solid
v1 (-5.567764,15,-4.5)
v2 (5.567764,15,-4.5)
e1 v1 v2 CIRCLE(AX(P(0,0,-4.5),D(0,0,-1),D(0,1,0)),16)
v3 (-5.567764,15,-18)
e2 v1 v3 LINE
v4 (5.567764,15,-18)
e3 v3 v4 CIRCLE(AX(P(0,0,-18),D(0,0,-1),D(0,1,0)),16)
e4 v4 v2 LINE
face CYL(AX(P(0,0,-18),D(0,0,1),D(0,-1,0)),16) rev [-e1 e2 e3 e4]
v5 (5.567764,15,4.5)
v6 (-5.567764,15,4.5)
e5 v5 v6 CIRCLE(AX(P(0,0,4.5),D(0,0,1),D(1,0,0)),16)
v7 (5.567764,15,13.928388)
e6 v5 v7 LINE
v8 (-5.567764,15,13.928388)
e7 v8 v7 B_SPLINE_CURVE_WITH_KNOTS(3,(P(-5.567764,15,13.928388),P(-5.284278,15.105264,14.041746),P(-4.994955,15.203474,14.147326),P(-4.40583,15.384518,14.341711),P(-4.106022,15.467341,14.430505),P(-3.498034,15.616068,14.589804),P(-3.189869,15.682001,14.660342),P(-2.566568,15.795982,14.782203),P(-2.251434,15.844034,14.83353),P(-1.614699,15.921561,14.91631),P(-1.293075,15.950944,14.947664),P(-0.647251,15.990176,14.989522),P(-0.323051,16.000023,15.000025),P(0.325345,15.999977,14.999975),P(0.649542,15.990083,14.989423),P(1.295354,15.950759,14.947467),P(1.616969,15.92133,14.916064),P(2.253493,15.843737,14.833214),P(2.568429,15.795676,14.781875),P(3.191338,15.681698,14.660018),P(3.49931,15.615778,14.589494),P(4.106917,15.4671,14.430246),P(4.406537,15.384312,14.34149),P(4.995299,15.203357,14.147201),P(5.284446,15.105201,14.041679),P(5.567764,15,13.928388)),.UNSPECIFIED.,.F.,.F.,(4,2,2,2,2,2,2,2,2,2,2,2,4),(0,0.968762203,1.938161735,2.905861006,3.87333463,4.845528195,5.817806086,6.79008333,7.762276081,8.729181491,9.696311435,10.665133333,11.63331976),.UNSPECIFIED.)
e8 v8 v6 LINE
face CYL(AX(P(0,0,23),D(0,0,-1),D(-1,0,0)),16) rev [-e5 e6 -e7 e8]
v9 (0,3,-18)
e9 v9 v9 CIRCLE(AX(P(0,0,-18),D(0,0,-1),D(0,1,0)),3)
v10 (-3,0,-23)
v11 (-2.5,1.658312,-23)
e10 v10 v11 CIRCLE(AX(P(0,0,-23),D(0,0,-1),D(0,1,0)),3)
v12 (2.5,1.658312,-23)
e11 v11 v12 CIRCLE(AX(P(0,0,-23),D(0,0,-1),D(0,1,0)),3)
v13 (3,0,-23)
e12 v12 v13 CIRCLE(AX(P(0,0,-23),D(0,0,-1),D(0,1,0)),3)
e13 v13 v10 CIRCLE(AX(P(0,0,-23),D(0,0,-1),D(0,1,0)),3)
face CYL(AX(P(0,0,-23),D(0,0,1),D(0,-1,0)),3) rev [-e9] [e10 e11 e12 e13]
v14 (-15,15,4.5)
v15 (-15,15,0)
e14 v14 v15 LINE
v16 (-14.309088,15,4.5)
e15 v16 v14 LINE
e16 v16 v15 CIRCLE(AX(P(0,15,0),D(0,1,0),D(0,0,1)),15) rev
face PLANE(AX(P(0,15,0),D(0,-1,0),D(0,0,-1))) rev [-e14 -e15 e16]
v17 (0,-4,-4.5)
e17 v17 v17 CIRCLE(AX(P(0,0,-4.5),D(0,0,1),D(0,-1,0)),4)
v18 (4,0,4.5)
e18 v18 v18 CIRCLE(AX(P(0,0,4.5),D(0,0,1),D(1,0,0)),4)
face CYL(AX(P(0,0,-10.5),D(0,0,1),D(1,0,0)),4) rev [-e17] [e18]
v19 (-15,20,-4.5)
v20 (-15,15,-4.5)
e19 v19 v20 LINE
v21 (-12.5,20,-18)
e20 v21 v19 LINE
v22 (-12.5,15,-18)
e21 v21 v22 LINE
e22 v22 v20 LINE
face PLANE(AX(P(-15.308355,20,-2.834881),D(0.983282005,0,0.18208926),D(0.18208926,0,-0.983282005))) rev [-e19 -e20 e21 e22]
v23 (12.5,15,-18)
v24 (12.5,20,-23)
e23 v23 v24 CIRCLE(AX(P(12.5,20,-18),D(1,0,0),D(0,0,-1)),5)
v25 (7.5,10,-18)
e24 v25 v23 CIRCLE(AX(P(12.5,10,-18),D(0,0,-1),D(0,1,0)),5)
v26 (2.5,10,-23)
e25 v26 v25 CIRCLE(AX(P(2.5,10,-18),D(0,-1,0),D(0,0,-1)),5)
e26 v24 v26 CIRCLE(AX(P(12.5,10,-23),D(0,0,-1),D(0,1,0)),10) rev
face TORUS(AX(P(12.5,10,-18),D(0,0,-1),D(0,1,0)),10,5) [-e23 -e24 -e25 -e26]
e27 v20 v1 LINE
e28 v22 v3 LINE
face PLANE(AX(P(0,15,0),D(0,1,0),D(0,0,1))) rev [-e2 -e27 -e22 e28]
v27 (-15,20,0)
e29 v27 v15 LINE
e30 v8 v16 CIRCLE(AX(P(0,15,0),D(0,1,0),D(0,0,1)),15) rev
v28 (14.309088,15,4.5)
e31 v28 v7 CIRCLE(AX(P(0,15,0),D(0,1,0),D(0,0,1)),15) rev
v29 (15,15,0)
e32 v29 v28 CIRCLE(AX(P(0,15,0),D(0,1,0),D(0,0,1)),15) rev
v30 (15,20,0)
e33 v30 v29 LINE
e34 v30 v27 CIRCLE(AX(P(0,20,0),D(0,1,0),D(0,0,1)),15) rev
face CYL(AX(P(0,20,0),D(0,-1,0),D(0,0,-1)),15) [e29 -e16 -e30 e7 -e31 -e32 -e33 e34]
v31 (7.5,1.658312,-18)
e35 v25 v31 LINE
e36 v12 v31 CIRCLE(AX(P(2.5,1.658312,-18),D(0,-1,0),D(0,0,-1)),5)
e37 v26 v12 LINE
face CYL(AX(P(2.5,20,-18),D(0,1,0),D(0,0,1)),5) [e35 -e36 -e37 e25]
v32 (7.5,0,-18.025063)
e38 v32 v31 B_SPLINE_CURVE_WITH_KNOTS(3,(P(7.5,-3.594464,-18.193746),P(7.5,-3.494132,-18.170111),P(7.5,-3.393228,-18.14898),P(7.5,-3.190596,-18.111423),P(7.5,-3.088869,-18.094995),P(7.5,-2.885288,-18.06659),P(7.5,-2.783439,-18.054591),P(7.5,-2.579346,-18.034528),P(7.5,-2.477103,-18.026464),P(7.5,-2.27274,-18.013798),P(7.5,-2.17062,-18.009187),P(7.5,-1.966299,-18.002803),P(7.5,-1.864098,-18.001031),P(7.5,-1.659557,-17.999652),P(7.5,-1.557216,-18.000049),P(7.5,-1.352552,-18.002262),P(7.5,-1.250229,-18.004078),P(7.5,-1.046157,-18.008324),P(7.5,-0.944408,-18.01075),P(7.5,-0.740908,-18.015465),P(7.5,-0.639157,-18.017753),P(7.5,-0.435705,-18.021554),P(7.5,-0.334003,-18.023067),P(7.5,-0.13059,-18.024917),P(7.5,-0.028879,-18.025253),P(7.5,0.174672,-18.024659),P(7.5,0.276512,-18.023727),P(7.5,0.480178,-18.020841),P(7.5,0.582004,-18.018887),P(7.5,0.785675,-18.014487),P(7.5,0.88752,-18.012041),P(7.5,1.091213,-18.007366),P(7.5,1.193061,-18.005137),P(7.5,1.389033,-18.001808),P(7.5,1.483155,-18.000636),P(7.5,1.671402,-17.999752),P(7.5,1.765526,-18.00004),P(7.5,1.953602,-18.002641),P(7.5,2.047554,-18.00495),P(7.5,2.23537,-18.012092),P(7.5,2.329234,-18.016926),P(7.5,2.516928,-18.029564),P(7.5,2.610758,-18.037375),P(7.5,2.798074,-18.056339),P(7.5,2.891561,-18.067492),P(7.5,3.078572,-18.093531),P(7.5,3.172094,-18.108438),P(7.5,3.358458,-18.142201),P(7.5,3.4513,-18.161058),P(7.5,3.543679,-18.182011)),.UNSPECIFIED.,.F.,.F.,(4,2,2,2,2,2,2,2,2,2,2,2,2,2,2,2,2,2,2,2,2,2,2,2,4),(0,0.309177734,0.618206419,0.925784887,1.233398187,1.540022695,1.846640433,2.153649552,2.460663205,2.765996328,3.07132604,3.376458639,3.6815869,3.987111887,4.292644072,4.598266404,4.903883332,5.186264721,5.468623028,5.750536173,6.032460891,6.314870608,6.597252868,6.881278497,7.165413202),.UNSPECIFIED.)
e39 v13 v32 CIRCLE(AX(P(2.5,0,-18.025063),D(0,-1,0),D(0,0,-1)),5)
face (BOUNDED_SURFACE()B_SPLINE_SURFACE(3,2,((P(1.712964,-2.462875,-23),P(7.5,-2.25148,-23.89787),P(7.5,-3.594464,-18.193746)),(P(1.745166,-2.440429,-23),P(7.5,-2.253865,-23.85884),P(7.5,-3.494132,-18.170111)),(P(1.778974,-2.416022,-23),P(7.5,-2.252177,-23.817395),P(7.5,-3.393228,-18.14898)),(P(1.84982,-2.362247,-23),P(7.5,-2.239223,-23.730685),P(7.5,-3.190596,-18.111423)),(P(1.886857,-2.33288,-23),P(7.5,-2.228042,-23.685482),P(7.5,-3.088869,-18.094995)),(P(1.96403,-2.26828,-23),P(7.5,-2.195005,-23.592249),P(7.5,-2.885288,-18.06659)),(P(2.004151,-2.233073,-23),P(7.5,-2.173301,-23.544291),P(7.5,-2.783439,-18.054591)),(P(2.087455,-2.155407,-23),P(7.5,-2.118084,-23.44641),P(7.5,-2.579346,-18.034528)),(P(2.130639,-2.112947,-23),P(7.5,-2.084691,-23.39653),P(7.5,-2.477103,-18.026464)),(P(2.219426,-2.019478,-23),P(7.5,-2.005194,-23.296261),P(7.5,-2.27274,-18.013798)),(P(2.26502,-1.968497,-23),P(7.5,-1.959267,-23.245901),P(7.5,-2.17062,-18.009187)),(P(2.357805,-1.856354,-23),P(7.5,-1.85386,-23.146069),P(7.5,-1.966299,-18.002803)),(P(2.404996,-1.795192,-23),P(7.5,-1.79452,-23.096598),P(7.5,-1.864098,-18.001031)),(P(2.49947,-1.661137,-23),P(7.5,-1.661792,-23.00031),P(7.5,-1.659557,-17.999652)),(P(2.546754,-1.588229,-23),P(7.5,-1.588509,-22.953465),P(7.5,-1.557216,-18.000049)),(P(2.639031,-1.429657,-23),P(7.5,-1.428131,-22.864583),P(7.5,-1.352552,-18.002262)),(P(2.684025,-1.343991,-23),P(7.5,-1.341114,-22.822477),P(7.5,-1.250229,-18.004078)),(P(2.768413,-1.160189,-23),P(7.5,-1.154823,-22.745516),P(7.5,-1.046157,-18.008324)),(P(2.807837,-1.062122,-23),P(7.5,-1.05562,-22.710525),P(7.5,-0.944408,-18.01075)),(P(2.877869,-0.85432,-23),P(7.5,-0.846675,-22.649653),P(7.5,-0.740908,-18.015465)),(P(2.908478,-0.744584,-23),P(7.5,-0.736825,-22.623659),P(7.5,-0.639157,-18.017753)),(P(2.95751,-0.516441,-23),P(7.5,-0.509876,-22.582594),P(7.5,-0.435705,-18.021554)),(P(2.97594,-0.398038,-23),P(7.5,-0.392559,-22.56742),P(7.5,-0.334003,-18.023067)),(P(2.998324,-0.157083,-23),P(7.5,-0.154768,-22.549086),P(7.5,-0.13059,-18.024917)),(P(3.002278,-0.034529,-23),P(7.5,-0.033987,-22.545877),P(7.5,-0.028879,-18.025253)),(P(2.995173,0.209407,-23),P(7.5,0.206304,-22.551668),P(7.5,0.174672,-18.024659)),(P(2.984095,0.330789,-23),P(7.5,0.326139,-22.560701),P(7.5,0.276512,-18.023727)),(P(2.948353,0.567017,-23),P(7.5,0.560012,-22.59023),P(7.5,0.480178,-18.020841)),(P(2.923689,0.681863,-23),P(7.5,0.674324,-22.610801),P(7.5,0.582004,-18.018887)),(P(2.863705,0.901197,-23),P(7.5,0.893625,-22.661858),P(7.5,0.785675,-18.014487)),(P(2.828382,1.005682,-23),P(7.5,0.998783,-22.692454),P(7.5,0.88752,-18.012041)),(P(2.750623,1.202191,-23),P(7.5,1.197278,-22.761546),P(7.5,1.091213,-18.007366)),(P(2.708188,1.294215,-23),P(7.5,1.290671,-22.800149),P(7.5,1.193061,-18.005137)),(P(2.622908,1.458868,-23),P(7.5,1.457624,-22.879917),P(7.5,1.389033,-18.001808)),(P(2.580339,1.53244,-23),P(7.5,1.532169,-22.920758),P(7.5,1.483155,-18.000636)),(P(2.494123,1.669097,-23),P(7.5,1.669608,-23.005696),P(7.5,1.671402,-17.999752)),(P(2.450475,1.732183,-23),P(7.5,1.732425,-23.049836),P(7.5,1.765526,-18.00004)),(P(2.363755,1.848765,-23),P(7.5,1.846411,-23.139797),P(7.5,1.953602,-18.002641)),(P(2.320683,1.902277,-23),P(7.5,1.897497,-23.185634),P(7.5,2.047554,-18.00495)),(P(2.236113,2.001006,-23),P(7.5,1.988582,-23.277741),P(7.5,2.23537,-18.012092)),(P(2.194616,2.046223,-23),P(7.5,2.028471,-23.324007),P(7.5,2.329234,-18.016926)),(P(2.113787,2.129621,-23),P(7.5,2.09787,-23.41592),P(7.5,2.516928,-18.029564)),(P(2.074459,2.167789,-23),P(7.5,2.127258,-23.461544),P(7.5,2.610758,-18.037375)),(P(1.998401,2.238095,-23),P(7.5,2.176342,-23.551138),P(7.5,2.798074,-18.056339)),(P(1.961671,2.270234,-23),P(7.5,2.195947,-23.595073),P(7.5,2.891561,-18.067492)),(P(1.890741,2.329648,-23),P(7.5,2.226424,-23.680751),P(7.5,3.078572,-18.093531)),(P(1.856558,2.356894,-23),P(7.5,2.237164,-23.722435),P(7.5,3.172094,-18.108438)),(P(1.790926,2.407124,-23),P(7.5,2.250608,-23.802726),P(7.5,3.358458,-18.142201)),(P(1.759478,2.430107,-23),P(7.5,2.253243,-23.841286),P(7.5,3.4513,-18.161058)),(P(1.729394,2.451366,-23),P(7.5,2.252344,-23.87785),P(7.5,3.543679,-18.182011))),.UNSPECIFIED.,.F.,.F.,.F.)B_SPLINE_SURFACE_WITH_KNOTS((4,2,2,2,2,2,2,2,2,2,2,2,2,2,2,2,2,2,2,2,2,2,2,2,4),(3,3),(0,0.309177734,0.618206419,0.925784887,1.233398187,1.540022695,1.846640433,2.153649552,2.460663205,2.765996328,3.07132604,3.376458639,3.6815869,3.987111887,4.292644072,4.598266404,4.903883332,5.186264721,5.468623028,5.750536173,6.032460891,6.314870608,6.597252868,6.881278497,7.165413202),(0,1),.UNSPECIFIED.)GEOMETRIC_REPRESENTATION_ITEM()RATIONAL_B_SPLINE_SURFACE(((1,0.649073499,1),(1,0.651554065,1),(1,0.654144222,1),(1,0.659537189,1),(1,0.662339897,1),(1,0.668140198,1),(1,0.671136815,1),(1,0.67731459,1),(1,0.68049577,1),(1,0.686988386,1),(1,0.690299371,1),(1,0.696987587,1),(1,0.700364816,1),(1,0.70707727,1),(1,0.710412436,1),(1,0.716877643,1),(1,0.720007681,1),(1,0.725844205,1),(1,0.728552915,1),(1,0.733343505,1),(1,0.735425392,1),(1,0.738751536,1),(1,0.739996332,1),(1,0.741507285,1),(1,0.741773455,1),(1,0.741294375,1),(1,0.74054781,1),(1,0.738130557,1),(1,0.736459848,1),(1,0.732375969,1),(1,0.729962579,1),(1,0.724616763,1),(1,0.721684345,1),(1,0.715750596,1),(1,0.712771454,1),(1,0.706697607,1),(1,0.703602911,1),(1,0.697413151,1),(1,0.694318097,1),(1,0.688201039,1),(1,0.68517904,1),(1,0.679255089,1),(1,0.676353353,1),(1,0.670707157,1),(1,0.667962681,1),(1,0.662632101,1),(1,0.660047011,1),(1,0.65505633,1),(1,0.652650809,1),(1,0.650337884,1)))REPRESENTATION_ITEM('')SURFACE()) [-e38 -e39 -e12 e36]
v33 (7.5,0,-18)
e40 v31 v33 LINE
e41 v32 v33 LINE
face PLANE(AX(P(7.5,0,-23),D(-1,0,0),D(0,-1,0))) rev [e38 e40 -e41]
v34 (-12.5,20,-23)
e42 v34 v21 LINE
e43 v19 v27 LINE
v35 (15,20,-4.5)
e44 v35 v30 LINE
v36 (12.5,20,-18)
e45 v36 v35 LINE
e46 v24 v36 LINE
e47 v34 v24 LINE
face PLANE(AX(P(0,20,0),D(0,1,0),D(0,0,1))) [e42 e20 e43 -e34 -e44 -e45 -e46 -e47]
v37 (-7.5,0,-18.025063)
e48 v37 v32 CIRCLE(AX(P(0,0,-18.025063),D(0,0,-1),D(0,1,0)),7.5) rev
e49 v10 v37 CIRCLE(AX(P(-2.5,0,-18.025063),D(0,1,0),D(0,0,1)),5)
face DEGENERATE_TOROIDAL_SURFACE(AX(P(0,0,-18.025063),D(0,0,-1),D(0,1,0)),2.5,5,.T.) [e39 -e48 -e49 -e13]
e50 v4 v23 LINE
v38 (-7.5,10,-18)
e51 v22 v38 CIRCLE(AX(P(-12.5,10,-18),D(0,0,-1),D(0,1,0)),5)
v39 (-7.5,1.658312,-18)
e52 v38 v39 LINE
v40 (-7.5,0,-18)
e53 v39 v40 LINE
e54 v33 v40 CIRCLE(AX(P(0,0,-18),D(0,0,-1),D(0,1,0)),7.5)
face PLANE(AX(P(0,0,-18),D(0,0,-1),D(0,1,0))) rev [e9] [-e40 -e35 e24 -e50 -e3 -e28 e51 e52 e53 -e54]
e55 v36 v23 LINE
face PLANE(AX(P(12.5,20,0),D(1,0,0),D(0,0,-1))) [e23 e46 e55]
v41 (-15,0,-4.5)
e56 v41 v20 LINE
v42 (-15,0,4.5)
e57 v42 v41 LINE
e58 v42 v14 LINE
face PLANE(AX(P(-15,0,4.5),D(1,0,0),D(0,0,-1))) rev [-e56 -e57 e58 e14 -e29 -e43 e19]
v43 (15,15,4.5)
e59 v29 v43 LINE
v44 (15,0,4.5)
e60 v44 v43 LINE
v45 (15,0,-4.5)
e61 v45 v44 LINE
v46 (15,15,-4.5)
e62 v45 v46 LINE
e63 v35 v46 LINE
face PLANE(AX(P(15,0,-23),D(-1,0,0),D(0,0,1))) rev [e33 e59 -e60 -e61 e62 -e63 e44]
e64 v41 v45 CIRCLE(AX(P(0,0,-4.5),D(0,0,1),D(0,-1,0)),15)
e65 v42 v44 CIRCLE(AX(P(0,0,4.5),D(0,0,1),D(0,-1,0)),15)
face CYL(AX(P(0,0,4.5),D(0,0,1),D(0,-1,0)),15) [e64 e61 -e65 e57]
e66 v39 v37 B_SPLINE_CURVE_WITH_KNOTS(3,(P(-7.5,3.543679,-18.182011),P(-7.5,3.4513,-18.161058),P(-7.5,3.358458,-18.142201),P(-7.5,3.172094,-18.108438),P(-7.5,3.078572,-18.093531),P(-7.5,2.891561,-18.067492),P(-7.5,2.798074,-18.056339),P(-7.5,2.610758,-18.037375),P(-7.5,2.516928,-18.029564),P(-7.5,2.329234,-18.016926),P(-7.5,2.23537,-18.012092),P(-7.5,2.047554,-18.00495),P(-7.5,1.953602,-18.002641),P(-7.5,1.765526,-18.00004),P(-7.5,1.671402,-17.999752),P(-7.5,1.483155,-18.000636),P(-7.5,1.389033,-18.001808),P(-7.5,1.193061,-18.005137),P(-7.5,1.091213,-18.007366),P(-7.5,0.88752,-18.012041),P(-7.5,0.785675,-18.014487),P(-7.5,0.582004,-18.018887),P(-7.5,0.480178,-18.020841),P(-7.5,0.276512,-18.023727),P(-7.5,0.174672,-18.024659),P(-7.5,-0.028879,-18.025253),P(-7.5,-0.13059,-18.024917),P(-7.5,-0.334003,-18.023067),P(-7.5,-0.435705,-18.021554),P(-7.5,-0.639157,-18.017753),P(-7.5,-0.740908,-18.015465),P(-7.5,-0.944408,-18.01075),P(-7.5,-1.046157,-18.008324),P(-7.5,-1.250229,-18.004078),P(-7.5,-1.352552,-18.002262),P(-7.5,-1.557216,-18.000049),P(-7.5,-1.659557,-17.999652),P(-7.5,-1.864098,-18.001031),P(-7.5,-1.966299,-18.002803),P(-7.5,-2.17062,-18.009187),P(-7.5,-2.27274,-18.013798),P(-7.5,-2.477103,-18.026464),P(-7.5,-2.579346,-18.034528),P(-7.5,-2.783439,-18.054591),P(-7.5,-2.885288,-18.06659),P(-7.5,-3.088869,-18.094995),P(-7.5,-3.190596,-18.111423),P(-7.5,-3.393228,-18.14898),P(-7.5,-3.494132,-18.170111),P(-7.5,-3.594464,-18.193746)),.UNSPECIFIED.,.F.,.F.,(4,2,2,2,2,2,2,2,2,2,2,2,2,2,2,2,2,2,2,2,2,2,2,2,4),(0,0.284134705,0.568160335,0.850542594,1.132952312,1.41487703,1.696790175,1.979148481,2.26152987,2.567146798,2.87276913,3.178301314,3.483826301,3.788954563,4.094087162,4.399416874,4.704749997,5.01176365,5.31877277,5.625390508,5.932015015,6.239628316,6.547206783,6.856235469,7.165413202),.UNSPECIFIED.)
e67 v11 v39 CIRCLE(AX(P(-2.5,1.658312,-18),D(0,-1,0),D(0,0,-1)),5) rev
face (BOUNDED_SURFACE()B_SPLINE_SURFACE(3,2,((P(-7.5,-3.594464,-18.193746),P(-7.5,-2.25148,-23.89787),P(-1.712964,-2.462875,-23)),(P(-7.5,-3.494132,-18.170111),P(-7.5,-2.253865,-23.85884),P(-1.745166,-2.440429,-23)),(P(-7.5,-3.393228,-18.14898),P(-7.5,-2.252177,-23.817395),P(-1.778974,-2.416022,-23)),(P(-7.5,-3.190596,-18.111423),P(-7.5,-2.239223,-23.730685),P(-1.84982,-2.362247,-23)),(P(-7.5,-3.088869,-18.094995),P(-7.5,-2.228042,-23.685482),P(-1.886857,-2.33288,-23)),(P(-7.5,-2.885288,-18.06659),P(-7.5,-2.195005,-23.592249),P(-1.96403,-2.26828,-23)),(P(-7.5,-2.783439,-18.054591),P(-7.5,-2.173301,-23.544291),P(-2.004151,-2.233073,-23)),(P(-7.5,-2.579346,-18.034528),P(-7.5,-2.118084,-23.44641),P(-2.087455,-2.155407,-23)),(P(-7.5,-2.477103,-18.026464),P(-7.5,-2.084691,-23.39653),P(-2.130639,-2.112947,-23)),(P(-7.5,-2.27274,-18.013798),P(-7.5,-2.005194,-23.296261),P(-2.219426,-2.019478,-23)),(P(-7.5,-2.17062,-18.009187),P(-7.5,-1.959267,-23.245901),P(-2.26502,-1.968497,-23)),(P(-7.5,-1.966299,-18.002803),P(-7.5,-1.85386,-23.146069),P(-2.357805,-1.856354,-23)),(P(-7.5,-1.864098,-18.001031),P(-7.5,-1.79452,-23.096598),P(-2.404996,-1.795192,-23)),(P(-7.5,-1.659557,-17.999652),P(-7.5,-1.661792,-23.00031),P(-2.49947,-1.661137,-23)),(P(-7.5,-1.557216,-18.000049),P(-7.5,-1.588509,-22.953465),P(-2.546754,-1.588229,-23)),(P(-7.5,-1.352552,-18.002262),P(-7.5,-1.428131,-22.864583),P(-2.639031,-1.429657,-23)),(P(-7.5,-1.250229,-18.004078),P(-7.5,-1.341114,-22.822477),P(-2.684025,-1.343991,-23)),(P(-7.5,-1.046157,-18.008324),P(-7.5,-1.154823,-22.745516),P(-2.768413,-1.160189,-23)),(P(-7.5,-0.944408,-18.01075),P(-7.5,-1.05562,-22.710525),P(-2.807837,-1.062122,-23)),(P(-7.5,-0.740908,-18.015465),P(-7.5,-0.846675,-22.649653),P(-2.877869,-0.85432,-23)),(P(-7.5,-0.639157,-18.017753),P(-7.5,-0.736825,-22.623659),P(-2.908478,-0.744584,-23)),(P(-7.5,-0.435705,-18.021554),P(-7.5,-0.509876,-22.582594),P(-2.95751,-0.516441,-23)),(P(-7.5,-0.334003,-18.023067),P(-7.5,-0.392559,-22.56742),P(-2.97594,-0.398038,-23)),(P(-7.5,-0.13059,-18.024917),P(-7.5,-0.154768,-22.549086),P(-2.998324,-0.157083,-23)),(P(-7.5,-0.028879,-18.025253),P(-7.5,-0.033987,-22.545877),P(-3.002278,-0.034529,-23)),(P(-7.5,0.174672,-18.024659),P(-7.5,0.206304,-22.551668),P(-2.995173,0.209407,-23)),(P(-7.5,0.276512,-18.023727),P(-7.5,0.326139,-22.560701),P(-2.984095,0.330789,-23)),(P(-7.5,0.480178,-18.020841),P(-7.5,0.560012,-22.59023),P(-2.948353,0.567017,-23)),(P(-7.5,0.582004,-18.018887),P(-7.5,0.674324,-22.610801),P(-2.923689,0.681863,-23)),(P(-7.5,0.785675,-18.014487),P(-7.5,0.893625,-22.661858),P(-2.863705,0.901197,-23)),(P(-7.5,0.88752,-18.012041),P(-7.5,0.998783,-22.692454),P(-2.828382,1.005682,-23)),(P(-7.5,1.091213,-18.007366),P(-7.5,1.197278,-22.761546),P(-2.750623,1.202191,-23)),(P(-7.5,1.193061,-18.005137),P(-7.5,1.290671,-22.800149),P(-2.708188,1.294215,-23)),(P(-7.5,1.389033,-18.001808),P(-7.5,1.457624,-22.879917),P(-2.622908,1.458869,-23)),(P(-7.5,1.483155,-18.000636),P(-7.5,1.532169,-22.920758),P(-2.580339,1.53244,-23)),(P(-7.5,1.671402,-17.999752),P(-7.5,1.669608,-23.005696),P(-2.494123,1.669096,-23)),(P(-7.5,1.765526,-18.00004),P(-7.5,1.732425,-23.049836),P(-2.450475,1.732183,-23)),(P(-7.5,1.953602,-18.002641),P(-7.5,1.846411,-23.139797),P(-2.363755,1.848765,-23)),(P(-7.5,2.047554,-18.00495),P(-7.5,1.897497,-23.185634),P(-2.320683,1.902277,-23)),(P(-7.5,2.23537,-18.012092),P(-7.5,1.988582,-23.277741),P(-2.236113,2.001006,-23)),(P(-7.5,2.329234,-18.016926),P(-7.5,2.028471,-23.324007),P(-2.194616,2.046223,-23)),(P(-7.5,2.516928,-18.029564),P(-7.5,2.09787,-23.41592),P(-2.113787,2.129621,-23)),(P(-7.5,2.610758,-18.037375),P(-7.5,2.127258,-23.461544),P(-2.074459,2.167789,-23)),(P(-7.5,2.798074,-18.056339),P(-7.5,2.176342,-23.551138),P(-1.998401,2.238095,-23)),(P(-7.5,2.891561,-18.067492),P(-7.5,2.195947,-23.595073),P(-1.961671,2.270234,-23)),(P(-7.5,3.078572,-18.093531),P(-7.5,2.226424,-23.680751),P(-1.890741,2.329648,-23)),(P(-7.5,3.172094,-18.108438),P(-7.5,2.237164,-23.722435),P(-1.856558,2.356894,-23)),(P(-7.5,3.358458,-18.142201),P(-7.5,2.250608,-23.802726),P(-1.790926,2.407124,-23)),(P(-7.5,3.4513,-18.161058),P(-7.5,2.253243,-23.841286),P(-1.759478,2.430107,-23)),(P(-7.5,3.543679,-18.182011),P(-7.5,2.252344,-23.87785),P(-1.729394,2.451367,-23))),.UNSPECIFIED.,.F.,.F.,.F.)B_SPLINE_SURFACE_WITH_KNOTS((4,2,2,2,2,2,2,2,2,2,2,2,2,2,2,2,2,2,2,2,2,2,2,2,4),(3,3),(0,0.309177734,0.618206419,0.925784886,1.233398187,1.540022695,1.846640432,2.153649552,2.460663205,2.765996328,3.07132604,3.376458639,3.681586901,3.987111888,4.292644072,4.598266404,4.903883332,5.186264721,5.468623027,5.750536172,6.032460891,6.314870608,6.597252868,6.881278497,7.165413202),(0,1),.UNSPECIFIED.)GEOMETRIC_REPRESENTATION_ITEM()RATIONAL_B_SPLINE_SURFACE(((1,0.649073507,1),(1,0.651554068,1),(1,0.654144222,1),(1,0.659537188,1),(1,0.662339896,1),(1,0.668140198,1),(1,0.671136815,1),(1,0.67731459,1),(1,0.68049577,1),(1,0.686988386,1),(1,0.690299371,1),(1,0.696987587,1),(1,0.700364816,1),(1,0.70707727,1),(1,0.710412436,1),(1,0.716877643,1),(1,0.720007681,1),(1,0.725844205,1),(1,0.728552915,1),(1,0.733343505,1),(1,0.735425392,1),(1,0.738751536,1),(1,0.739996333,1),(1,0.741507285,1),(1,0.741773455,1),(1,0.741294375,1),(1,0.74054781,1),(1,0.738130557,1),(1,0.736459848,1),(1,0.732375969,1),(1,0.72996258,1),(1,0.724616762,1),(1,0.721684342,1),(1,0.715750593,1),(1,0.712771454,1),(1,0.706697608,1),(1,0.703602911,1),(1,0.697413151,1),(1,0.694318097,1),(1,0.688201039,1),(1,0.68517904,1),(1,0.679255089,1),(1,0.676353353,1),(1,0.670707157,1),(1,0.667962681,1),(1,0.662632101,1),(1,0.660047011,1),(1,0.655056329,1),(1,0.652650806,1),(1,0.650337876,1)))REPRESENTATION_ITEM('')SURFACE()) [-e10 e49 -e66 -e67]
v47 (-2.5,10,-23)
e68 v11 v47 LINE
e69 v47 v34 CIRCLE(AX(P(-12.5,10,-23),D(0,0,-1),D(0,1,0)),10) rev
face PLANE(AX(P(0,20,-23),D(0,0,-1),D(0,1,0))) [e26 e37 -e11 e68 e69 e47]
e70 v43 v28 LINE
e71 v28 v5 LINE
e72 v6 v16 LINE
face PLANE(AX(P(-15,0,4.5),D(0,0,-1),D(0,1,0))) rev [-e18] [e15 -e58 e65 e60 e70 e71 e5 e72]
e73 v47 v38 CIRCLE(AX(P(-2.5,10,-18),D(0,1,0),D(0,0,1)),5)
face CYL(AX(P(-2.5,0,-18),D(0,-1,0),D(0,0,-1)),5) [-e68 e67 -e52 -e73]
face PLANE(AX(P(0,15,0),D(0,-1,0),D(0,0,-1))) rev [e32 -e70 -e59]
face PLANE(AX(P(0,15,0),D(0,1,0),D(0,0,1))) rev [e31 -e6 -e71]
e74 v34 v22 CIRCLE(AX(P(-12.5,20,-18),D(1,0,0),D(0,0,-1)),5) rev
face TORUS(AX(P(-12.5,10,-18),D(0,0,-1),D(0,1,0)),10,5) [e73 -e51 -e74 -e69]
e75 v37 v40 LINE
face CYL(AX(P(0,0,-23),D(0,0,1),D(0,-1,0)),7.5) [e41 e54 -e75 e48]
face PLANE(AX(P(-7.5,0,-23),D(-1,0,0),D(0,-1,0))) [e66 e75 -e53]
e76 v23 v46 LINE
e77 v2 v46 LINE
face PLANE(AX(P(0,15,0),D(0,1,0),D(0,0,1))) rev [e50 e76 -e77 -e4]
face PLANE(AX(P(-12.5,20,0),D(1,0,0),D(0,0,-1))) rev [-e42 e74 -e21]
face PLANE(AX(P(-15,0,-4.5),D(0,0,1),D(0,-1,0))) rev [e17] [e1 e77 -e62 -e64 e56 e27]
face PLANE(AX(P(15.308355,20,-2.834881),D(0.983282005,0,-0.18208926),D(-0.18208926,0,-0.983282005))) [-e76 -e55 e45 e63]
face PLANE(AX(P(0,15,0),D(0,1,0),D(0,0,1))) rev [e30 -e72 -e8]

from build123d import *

# Parameters (mm, degrees)
SKETCH1_R            = 15
BOSS_EXTRUDE1_DEPTH  = 30
SKETCH8_W            = 30
SKETCH8_H            = 15
REVOLVE1_ANGLE       = 180
SKETCH9_W            = 30
SKETCH9_H            = 30
BOSS_EXTRUDE3_DEPTH  = 15
SKETCH10_R           = 5
CUT_EXTRUDE1_DEPTH   = 30
SKETCH13_R           = 16
CUT_EXTRUDE2_DEPTH   = 10
SKETCH14_W           = 10
SKETCH14_H           = 15
CUT_EXTRUDE3_DEPTH   = 67
CUT_EXTRUDE4_START   = -7
SKETCH15_R           = 11
SKETCH15_R_2         = 5
CUT_EXTRUDE4_DEPTH   = 7
SKETCH16_R           = 11
SKETCH16_R_2         = 5
CUT_EXTRUDE5_DEPTH   = 7
SKETCH17_R           = 15
SKETCH17_R_2         = 8
SKETCH17_R_3         = 3.5
BOSS_EXTRUDE4_DEPTH  = 2
BOSS_EXTRUDE5_DEPTH  = 5
BOSS_EXTRUDE6_DEPTH  = 16
SKETCH21_W           = 53
SKETCH21_H           = 30
CUT_EXTRUDE7_DEPTH   = 20
SKETCH23_W           = 15
SKETCH23_H           = 9
SKETCH24_W           = 30
SKETCH24_H           = 9
BOSS_EXTRUDE7_DEPTH  = 15
SKETCH25_R           = 4
CUT_EXTRUDE8_DEPTH   = 15
BOSS_EXTRUDE8_START  = 3
SKETCH26_W           = 10
SKETCH26_H           = 15
BOSS_EXTRUDE8_DEPTH  = 5
SKETCH30_W           = 30
SKETCH30_H           = 15
BOSS_EXTRUDE9_DEPTH  = 3
SKETCH27_R           = 16
CUT_EXTRUDE9_DEPTH   = 16
SKETCH28_R           = 16
CUT_EXTRUDE10_DEPTH  = 10.5
SKETCH29_R           = 16
CUT_EXTRUDE12_DEPTH  = 10
SKETCH31_W           = 53
SKETCH31_H           = 41.496728026
CUT_EXTRUDE13_DEPTH  = 37
BOSS_EXTRUDE10_DEPTH = 5
SKETCH35_W           = 30
SKETCH35_H           = 9
BOSS_EXTRUDE11_DEPTH = 5
SKETCH36_R           = 16
CUT_EXTRUDE14_DEPTH  = 13.5
SKETCH37_R           = 16
CUT_EXTRUDE15_DEPTH  = 18.5
FILLET1_R            = 5


with BuildPart() as part:
    # Sketch1 → Boss-Extrude1 (new body)
    with BuildSketch(Plane(origin=(0, 0, 0), x_dir=(1, 0, 0), z_dir=(0, 1, 0))):
        with Locations(Location((0, 0, 0), (0, 0, 270))):
            Circle(SKETCH1_R)
    extrude(amount=BOSS_EXTRUDE1_DEPTH)

    # Sketch8 → Revolve1 (revolve)
    with BuildSketch(Plane(origin=(0, 30, 0), x_dir=(1, 0, 0), z_dir=(0, 1, 0))):
        with Locations((0, -7.5)):
            Rectangle(SKETCH8_W, SKETCH8_H)
    revolve(axis=Axis((15, 30, 0), (-1, 0, 0)), revolution_arc=REVOLVE1_ANGLE)

    # Sketch9 → Boss-Extrude3 (add)
    with BuildSketch(Plane.XZ.offset(-30)):
        Rectangle(SKETCH9_W, SKETCH9_H)
    extrude(amount=BOSS_EXTRUDE3_DEPTH)

    # Sketch10 → Cut-Extrude1 (cut)
    with BuildSketch(Plane(origin=(15, 0, 0), x_dir=(0, 0, -1), z_dir=(1, 0, 0))):
        with Locations((0, 30)):
            Circle(SKETCH10_R)
    extrude(amount=-CUT_EXTRUDE1_DEPTH, mode=Mode.SUBTRACT)

    # Sketch13 → Cut-Extrude2 (cut)
    with BuildSketch(Plane(origin=(5, 0, 0), x_dir=(0, 0, -1), z_dir=(1, 0, 0))):
        with Locations((0, 30)):
            Circle(SKETCH13_R)
    extrude(amount=-CUT_EXTRUDE2_DEPTH, mode=Mode.SUBTRACT)

    # Sketch14 → Cut-Extrude3 (cut)
    with BuildSketch(Plane.XY.offset(15)):
        with Locations((0, 22.5)):
            Rectangle(SKETCH14_W, SKETCH14_H)
    extrude(amount=-CUT_EXTRUDE3_DEPTH, mode=Mode.SUBTRACT)

    # Sketch15 → Cut-Extrude4 (cut)
    with BuildSketch(Plane.ZY.offset(15).offset(CUT_EXTRUDE4_START)):
        with Locations((0, 30)):
            Circle(SKETCH15_R)
        with Locations(Location((0, 30, 0), (0, 0, 180))):
            Circle(SKETCH15_R_2, mode=Mode.SUBTRACT)
    extrude(amount=CUT_EXTRUDE4_DEPTH, mode=Mode.SUBTRACT)

    # Sketch16 → Cut-Extrude5 (cut)
    with BuildSketch(Plane(origin=(15, 0, 0), x_dir=(0, 0, -1), z_dir=(1, 0, 0))):
        with Locations(Location((0, 30, 0), (0, 0, 180))):
            Circle(SKETCH16_R)
        with Locations((0, 30)):
            Circle(SKETCH16_R_2, mode=Mode.SUBTRACT)
    extrude(amount=-CUT_EXTRUDE5_DEPTH, mode=Mode.SUBTRACT)



with BuildPart() as body_2:
    # Sketch17 → Boss-Extrude4 (new body)
    # profile 1 of 4: a face of its own
    with BuildSketch(Plane.ZY.offset(31)):
        with Locations((0, 30)):
            Circle(SKETCH17_R)
        with Locations((0, 30)):
            Circle(SKETCH17_R_2, mode=Mode.SUBTRACT)
    # profile 2 of 4: a face of its own
    with BuildSketch(Plane.ZY.offset(31)):
        with Locations((0, 30)):
            Circle(SKETCH17_R_2)
        with Locations((0, 30)):
            Circle(SKETCH17_R_3, mode=Mode.SUBTRACT)
    # profile 3 of 4: a face of its own
    with BuildSketch(Plane.ZY.offset(31)):
        with BuildLine():
            ThreePointArc((0, 15), (-10.606601718, 19.393398282), (-15, 30))
            Line((-15, 30), (-15, 15))
            Line((-15, 15), (0, 15))
        make_face()
    # profile 4 of 4: a face of its own
    with BuildSketch(Plane.ZY.offset(31)):
        with BuildLine():
            Line((15, 15), (15, 30))
            ThreePointArc((15, 30), (10.606601718, 19.393398282), (0, 15))
            Line((0, 15), (15, 15))
        make_face()
    extrude(amount=BOSS_EXTRUDE4_DEPTH)

    # Sketch18 → Boss-Extrude5 (add)
    with BuildSketch(Plane.ZY.offset(33)):
        with BuildLine():
            ThreePointArc((-8.5, 30), (0, 38.5), (8.5, 30))
            Line((8.5, 30), (8.5, 15))
            Line((8.5, 15), (15, 15))
            Line((15, 15), (15, 30))
            ThreePointArc((15, 30), (0, 45), (-15, 30))
            Line((-15, 30), (-15, 15))
            Line((-15, 15), (-8.5, 15))
            Line((-8.5, 15), (-8.5, 30))
        make_face()
    extrude(amount=BOSS_EXTRUDE5_DEPTH)


with BuildPart() as part_1:
    add(part.part)

    add(body_2.part)  # Boss-Extrude6 merges body 2
    # Sketch20 → Boss-Extrude6 (add)
    with BuildSketch(Plane.ZY.offset(15)):
        with BuildLine():
            ThreePointArc((11.5, 30), (0, 18.5), (-11.5, 30))
            Line((-11.5, 30), (-15, 30))
            Line((-15, 30), (-15, 15))
            Line((-15, 15), (0, 15))
            Line((0, 15), (15, 15))
            Line((15, 15), (15, 30))
            Line((15, 30), (11.5, 30))
        make_face()
    extrude(amount=BOSS_EXTRUDE6_DEPTH)

    # Sketch21 → Cut-Extrude7 (cut)
    with BuildSketch(Plane.XZ.offset(-15)):
        with Locations((-11.5, 0)):
            Rectangle(SKETCH21_W, SKETCH21_H)
    extrude(amount=CUT_EXTRUDE7_DEPTH, mode=Mode.SUBTRACT)


with BuildPart() as cut_extrude7_piece_1:
    # of the separate pieces the step leaves, piece 1, a body of its own (cut_extrude7_pieces)
    add(part_1.part.solids().sort_by_distance((-31, 30, 15))[0])



with BuildPart() as cut_extrude7_piece_2:
    # of the separate pieces the step leaves, piece 2, a body of its own (cut_extrude7_pieces)
    add(part_1.part.solids().sort_by_distance((5, 15, -15))[0])


with BuildPart() as body_3:
    # Sketch23 → Revolve2 (revolve)
    with BuildSketch(Plane(origin=(0, 0, 0), x_dir=(-1, 0, 0), z_dir=(0, -1, 0)), mode=Mode.PRIVATE) as revolve2_sk:
        with Locations((-7.5, 0)):
            Rectangle(SKETCH23_W, SKETCH23_H)
    revolve(revolve2_sk.sketch.rotate(Axis((0, 0, 4.5), (0, 0, -1)), 90), axis=Axis((0, 0, 4.5), (0, 0, -1)))


with BuildPart() as cut_extrude7_piece_1_1:
    add(cut_extrude7_piece_1.part)

    add(cut_extrude7_piece_2.part)  # Boss-Extrude7 merges Cut-Extrude7 piece 2

    add(body_3.part)  # Boss-Extrude7 merges body 3
    # Sketch24 → Boss-Extrude7 (add)
    with BuildSketch(Plane.XZ.offset(-15)):
        Rectangle(SKETCH24_W, SKETCH24_H)
    extrude(amount=BOSS_EXTRUDE7_DEPTH)

    # Sketch25 → Cut-Extrude8 (cut)
    with BuildSketch(Plane.XY.offset(4.5)):
        Circle(SKETCH25_R)
    extrude(amount=-CUT_EXTRUDE8_DEPTH, mode=Mode.SUBTRACT)



with BuildPart() as body_2_2:
    # Sketch26 → Boss-Extrude8 (new body)
    with BuildSketch(Plane(origin=(0, 0, -15), x_dir=(-1, 0, 0), z_dir=(0, 0, -1)).offset(BOSS_EXTRUDE8_START)):
        with Locations((-10, 22.5)):
            Rectangle(SKETCH26_W, SKETCH26_H)
        with BuildLine():
            Line((15, 30), (-5, 30))
            Line((-5, 30), (-5, 15))
            Line((-5, 15), (-12.5, 15))
            ThreePointArc((-12.5, 15), (-8.964466094, 13.535533906), (-7.5, 10))
            Line((-7.5, 10), (-7.5, 0))
            ThreePointArc((-7.5, 0), (0, 7.5), (7.5, 0))
            Line((7.5, 0), (7.5, 10))
            ThreePointArc((7.5, 10), (8.964466094, 13.535533906), (12.5, 15))
            Line((12.5, 15), (15, 15))
            Line((15, 15), (15, 30))
        make_face()
        with BuildLine():
            ThreePointArc((7.5, 0), (0, 7.5), (-7.5, 0))
            Line((-7.5, 0), (-3, 0))
            ThreePointArc((-3, 0), (0, 3), (3, 0))
            Line((3, 0), (7.5, 0))
        make_face()
        with BuildLine():
            Line((-3, 0), (-7.5, 0))
            ThreePointArc((-7.5, 0), (0, -7.5), (7.5, 0))
            Line((7.5, 0), (3, 0))
            ThreePointArc((3, 0), (0, -3), (-3, 0))
        make_face()
    extrude(amount=BOSS_EXTRUDE8_DEPTH)


with BuildPart() as cut_extrude7_piece_1_2:
    add(cut_extrude7_piece_1_1.part)

    add(body_2_2.part)  # Boss-Extrude9 merges body 2 2
    # Sketch30 → Boss-Extrude9 (add)
    with BuildSketch(Plane.XY.offset(-18)):
        with Locations((0, 22.5)):
            Rectangle(SKETCH30_W, SKETCH30_H)
    extrude(amount=BOSS_EXTRUDE9_DEPTH)

    # Sketch27 → Cut-Extrude9 (cut)
    with BuildSketch(Plane.XY.offset(4.5)):
        Circle(SKETCH27_R)
    extrude(amount=CUT_EXTRUDE9_DEPTH, mode=Mode.SUBTRACT)

    # Sketch28 → Cut-Extrude10 (cut)
    with BuildSketch(Plane(origin=(0, 0, -4.5), x_dir=(-1, 0, 0), z_dir=(0, 0, -1))):
        Circle(SKETCH28_R)
    extrude(amount=CUT_EXTRUDE10_DEPTH, mode=Mode.SUBTRACT)

    # Sketch29 → Cut-Extrude12 (cut)
    with BuildSketch(Plane.ZY.offset(-5)):
        with Locations((0, 30)):
            Circle(SKETCH29_R)
    extrude(amount=CUT_EXTRUDE12_DEPTH, mode=Mode.SUBTRACT)

    # Sketch31 → Cut-Extrude13 (cut)
    with BuildSketch(Plane.XZ.offset(-15)):
        with Locations((-11.5, -5.748364013)):
            Rectangle(SKETCH31_W, SKETCH31_H)
    extrude(amount=-CUT_EXTRUDE13_DEPTH, mode=Mode.SUBTRACT)


with BuildPart() as cut_extrude13_piece_1:
    # of the separate pieces the step leaves, piece 1, a body of its own (cut_extrude13_pieces)
    add(cut_extrude7_piece_1_2.part.solids().sort_by_distance((5, 14.645847467, 4.5))[0])



with BuildPart() as cut_extrude13_piece_2:
    # of the separate pieces the step leaves, piece 2, a body of its own (cut_extrude13_pieces)
    add(cut_extrude7_piece_1_2.part.solids().sort_by_distance((-7.5, 10, -18))[0])


with BuildPart() as cut_extrude13_piece_1_1:
    add(cut_extrude13_piece_1.part)

    add(cut_extrude13_piece_2.part)  # Boss-Extrude10 merges Cut-Extrude13 piece 2
    # Sketch33 → Boss-Extrude10 (add)
    with BuildSketch(Plane(origin=(0, 15, 0), x_dir=(1, 0, 0), z_dir=(0, 1, 0))):
        with BuildLine():
            Line((12.5, 23), (-12.5, 23))
            Line((-12.5, 23), (-12.5, 18))
            Line((-12.5, 18), (-15, 4.5))
            Line((-15, 4.5), (-15, 0))
            ThreePointArc((-15, 0), (0, -15), (15, 0))
            Line((15, 0), (15, 4.5))
            Line((15, 4.5), (12.5, 18))
            Line((12.5, 18), (12.5, 23))
        make_face()
    extrude(amount=BOSS_EXTRUDE10_DEPTH)

    # Sketch35 → Boss-Extrude11 (add)
    with BuildSketch(Plane.XZ.offset(-15)):
        Rectangle(SKETCH35_W, SKETCH35_H)
    extrude(amount=BOSS_EXTRUDE11_DEPTH)

    # Sketch36 → Cut-Extrude14 (cut)
    with BuildSketch(Plane(origin=(0, 0, -4.5), x_dir=(-1, 0, 0), z_dir=(0, 0, -1))):
        Circle(SKETCH36_R)
    extrude(amount=CUT_EXTRUDE14_DEPTH, mode=Mode.SUBTRACT)

    # Sketch37 → Cut-Extrude15 (cut)
    with BuildSketch(Plane.XY.offset(4.5)):
        Circle(SKETCH37_R)
    extrude(amount=CUT_EXTRUDE15_DEPTH, mode=Mode.SUBTRACT)

    # Fillet1
    fillet1_edges = [cut_extrude13_piece_1_1.edges().sort_by_distance(p)[0] for p in [
        (-8.964466094, 13.535533906, -23),
        (8.964466094, 13.535533906, -23),
        (7.5, 5, -23),
        (-7.5, 5, -23),
    ]]
    fillet(fillet1_edges, radius=FILLET1_R - 0.0001)  # a hair under: the kernel refuses the full size


solid = cut_extrude13_piece_1_1.part
